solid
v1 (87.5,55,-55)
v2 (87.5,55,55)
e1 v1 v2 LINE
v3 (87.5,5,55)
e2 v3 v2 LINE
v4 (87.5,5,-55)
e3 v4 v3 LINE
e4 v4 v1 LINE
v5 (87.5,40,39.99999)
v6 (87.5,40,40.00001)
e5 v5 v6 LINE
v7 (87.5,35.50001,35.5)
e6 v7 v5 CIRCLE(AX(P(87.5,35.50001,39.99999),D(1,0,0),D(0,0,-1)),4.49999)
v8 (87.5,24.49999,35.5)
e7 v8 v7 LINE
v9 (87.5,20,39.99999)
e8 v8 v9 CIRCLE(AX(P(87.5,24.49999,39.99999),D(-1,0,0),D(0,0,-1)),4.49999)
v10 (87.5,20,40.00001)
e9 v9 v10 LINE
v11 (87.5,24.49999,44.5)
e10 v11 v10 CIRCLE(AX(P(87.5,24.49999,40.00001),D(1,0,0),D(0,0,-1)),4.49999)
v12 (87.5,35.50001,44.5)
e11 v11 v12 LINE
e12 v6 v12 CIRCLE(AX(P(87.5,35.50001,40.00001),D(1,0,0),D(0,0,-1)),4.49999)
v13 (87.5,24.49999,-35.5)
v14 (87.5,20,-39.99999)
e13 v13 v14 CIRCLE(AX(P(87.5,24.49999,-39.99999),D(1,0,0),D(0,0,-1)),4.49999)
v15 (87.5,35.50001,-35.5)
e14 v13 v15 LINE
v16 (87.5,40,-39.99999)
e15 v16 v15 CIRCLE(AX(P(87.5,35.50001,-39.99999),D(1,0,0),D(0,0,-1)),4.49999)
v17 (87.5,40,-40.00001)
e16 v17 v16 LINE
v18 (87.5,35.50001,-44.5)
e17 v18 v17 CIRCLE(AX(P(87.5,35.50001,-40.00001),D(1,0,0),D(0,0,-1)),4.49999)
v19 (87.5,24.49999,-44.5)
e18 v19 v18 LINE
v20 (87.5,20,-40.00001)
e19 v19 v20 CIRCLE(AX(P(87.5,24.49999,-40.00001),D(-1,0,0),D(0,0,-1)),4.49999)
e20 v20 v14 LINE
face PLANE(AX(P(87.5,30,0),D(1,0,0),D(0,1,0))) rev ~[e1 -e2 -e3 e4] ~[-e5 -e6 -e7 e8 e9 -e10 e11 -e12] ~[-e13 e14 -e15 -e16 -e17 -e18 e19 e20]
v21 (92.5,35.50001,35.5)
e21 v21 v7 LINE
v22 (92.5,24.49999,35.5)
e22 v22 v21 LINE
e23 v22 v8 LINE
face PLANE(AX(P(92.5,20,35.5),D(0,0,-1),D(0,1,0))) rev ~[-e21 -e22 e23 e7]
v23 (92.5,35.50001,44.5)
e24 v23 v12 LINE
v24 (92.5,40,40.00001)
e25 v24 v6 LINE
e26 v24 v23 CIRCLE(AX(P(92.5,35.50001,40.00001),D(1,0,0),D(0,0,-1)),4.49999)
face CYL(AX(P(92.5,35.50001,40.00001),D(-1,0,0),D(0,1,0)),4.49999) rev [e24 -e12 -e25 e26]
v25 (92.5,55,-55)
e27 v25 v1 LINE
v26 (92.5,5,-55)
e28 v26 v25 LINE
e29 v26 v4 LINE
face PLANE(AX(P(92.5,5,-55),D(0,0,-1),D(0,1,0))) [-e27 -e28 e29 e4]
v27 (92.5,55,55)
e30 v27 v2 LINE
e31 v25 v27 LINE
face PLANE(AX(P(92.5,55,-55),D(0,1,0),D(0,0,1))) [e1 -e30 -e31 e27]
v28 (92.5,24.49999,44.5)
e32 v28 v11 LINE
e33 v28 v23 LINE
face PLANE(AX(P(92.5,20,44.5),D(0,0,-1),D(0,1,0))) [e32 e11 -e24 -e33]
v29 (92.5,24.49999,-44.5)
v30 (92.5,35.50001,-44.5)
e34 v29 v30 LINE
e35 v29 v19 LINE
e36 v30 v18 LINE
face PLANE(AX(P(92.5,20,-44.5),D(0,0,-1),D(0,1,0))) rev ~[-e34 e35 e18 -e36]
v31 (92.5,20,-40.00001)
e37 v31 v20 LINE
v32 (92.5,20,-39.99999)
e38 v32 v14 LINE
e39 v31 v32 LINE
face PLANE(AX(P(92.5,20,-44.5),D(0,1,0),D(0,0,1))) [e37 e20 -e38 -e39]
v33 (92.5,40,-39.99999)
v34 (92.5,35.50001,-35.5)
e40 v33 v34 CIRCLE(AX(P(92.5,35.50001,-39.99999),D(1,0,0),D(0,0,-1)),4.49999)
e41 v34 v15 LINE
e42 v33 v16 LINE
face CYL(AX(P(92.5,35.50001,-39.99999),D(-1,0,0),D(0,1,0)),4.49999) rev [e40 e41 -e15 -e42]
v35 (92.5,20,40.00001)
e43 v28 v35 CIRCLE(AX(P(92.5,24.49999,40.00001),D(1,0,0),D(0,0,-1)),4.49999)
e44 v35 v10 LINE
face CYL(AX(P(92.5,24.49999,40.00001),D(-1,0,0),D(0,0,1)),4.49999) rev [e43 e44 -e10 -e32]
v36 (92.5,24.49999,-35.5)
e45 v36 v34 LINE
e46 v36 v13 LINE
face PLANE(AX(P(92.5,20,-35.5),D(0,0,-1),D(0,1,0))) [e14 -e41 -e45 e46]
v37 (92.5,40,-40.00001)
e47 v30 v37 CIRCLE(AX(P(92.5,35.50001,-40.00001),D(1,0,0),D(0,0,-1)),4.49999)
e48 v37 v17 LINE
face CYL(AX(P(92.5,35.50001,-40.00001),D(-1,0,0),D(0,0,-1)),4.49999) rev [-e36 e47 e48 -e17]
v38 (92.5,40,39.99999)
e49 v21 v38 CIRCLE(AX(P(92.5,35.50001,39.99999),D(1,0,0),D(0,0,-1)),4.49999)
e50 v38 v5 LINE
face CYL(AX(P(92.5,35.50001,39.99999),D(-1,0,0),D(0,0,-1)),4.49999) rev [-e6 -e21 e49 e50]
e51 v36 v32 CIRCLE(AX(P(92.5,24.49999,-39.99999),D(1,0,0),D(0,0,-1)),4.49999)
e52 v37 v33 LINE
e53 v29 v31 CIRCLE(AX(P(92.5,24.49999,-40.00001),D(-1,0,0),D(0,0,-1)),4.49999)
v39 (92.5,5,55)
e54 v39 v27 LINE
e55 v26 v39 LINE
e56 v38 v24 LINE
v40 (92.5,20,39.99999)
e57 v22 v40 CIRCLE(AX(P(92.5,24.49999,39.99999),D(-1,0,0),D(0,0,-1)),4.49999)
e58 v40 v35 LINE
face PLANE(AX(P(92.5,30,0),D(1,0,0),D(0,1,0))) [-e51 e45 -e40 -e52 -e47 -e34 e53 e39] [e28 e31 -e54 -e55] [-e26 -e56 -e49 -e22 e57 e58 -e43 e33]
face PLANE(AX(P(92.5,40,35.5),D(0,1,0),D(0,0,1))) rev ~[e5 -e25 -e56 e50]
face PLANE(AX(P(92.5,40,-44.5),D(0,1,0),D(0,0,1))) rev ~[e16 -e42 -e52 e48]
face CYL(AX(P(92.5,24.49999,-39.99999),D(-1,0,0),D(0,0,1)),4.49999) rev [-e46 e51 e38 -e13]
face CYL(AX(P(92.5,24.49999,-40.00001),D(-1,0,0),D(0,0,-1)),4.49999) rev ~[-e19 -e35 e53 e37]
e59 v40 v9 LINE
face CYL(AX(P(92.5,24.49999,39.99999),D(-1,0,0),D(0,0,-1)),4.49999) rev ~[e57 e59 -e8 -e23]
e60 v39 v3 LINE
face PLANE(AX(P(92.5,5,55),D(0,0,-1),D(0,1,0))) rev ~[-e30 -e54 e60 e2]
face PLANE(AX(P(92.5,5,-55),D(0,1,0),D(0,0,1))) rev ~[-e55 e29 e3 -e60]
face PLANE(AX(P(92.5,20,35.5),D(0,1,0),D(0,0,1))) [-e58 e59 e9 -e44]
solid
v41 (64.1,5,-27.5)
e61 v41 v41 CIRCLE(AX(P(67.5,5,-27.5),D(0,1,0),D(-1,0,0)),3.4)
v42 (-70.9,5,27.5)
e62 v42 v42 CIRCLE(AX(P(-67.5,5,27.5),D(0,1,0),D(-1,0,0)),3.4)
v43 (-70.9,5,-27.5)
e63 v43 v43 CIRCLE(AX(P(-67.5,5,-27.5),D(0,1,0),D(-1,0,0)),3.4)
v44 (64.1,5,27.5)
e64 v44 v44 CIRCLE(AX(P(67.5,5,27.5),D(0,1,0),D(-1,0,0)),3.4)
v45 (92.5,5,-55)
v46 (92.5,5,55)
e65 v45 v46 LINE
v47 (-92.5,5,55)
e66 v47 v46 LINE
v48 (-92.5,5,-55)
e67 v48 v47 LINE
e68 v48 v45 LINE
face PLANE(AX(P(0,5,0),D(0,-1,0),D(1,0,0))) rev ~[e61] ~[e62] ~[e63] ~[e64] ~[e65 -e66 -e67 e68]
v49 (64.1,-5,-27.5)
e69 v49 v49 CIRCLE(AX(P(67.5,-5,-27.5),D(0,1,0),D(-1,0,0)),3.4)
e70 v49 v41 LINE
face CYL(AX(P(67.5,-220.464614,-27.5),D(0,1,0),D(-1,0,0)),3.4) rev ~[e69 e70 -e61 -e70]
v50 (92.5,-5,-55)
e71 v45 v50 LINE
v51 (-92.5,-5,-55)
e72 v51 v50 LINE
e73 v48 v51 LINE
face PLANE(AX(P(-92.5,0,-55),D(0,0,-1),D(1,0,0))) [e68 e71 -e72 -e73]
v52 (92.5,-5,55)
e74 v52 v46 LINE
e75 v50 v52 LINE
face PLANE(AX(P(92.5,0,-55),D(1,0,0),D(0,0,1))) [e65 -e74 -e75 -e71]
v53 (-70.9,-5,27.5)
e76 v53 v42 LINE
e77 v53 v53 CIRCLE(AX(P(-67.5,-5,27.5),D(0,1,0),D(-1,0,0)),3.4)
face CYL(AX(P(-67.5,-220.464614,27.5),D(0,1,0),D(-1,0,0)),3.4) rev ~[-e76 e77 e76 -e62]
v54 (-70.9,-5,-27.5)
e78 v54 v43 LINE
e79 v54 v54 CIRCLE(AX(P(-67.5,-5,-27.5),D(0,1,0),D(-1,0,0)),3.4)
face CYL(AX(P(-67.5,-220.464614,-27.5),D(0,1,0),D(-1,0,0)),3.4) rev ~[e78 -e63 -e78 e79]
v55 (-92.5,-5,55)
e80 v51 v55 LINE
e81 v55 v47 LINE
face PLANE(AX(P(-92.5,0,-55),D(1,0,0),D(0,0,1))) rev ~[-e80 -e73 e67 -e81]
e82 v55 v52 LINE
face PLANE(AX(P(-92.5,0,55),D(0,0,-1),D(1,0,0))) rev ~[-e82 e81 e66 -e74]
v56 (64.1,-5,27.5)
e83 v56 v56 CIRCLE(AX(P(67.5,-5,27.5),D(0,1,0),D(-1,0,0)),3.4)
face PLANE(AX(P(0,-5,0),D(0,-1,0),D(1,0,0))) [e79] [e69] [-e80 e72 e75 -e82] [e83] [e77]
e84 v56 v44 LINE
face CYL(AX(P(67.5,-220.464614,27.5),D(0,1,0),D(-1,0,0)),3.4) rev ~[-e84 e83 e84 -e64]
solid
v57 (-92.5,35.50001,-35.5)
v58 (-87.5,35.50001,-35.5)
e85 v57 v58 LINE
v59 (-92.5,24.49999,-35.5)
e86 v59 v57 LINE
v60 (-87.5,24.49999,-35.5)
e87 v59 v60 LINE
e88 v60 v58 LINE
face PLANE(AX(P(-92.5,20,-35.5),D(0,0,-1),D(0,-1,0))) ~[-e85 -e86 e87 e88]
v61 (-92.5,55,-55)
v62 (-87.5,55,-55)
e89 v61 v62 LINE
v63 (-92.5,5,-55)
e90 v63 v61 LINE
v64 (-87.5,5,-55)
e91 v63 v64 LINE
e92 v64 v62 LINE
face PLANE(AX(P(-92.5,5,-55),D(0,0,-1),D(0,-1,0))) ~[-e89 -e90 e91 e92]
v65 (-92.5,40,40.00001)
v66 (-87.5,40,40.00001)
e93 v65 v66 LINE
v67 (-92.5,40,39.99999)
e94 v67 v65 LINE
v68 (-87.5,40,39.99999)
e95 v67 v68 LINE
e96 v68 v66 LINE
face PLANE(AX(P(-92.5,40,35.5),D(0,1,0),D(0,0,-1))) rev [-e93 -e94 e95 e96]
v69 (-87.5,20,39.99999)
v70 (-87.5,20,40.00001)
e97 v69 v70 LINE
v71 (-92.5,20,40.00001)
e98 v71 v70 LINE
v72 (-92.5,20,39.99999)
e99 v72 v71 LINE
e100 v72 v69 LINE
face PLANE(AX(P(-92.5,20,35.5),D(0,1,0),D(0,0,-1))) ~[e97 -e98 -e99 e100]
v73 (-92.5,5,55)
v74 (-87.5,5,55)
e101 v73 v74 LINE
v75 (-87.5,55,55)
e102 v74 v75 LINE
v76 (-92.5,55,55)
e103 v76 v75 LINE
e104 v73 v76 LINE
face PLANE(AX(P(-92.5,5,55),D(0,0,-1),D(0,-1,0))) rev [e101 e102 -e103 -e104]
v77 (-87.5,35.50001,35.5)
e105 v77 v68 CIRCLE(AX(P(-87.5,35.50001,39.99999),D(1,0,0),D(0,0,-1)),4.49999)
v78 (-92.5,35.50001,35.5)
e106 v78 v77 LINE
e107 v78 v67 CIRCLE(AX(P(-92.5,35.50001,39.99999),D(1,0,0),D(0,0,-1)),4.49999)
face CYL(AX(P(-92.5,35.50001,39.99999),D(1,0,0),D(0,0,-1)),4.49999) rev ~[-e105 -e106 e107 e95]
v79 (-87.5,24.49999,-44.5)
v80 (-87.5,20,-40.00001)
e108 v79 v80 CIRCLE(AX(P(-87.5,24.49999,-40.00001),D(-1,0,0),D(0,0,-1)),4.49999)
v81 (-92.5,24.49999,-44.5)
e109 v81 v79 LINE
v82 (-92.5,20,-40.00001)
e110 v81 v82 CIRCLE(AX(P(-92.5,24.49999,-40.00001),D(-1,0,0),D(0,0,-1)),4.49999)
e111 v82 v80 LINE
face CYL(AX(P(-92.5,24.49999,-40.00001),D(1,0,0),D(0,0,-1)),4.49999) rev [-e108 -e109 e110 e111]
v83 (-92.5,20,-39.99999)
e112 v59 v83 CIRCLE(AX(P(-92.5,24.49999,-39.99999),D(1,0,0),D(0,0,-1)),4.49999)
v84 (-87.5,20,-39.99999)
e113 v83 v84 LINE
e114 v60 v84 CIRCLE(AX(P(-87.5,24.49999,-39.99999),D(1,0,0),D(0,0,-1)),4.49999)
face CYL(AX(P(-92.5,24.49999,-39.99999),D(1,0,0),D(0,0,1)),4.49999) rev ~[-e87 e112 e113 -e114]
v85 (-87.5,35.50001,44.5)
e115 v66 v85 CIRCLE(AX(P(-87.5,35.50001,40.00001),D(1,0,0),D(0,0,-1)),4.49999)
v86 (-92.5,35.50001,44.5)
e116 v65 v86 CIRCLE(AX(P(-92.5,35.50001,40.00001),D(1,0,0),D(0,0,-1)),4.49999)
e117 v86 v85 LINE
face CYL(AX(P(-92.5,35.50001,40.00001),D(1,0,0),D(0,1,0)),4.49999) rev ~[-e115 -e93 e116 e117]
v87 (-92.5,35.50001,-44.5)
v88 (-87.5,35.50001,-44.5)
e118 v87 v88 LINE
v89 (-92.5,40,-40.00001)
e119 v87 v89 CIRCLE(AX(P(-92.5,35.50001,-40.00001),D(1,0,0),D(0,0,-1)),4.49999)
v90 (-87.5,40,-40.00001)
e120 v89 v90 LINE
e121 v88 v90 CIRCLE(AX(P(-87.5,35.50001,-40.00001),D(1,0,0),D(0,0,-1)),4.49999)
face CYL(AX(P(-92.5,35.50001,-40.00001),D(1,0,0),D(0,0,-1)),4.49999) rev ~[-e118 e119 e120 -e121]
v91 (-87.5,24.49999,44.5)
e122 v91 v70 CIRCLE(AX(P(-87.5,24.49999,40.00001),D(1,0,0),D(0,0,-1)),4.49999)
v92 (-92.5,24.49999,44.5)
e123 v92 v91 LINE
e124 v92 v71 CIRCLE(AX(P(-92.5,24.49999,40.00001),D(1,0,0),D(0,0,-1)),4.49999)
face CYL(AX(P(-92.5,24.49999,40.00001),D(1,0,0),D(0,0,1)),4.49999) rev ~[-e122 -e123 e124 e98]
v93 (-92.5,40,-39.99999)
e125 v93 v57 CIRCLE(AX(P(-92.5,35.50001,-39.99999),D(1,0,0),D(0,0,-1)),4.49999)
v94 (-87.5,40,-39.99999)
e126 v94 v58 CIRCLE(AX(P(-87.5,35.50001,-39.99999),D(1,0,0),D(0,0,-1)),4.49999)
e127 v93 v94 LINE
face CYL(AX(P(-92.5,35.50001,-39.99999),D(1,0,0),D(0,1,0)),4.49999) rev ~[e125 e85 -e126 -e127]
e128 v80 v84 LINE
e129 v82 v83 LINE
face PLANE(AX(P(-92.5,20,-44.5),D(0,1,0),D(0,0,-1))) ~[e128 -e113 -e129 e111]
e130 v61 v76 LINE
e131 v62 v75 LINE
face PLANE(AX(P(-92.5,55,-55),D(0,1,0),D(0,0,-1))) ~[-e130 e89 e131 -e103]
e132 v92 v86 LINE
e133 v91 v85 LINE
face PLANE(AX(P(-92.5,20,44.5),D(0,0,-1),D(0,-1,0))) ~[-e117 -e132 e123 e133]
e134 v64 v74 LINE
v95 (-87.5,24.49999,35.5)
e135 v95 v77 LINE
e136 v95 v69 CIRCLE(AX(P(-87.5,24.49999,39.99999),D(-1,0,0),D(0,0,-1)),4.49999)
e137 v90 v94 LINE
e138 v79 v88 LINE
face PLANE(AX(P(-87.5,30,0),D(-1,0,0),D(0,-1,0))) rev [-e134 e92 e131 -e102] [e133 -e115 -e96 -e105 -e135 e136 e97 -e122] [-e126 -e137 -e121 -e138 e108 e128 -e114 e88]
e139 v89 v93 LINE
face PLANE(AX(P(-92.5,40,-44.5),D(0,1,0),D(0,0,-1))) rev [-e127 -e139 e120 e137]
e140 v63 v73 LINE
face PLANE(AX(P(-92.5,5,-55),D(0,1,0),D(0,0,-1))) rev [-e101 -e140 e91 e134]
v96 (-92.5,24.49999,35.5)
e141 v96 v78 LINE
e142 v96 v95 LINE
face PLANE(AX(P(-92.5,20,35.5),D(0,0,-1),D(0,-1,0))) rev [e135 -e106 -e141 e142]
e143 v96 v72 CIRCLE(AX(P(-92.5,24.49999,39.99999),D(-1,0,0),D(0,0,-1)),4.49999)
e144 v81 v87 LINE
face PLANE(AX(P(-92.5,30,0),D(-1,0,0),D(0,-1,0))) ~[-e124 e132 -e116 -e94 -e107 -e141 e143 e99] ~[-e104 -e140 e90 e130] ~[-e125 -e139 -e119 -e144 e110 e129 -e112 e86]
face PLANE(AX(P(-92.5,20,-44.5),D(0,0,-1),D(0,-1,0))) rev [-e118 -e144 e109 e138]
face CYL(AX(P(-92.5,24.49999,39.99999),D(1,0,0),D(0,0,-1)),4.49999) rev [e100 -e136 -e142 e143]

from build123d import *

# Parameters (mm, degrees)
F0_W     = 185
F0_H     = 110
F1_DEPTH = 5
F3_D     = 6.8
F4_W     = 50
F4_H     = 110
F5_DEPTH = 5
F6_W     = 20
F6_H     = 9
F7_DEPTH = 185.001
F8_R     = 4.49999


# Not quite as in the source:
# - a fillet or chamfer is up to 0.001 mm smaller than in the source, because OpenCascade refuses the exact size


with BuildPart() as f1:
    # F0 (on Front) → F1 (new body, symmetric)
    with BuildSketch(Plane.XZ):
        Rectangle(F0_W, F0_H)
    extrude(amount=F1_DEPTH, both=True)

    # F3 (through all)
    with Locations(Plane.XZ.offset(5)):
        with Locations((-67.5, 27.5), (-67.5, -27.5), (67.5, -27.5), (67.5, 27.5)):
            Hole(F3_D / 2)


with BuildPart() as f5:
    # F4 (on face) → F5 (new body)
    with BuildSketch(Plane.YZ.offset(92.5)):
        with Locations((30, 0)):
            Rectangle(F4_W, F4_H)
    extrude(amount=-F5_DEPTH)

    # F6 (on face) → F7 (cut, through all)
    with BuildSketch(Plane.YZ.offset(92.5)):
        with Locations((30, 40)):
            Rectangle(F6_W, F6_H)
        with Locations((30, -40)):
            Rectangle(F6_W, F6_H)
    extrude(amount=-F7_DEPTH, mode=Mode.SUBTRACT)

    # F8 (radius 4.5 in the source; OpenCascade refuses exactly that, so slightly less here)
    f8_edges = [f5.edges().sort_by_distance(p)[0] for p in [
        (90, 20, 35.5),
        (90, 20, 44.5),
        (90, 20, -35.5),
        (90, 20, -44.5),
        (90, 40, -35.5),
        (90, 40, 44.5),
        (90, 40, 35.5),
        (90, 40, -44.5),
    ]]
    fillet(f8_edges, radius=F8_R)


with BuildPart() as f9_1:
    # F9: instance of F5
    add(f5.part.mirror(Plane.YZ))


solid = Compound([f1.part, f5.part, f9_1.part])
